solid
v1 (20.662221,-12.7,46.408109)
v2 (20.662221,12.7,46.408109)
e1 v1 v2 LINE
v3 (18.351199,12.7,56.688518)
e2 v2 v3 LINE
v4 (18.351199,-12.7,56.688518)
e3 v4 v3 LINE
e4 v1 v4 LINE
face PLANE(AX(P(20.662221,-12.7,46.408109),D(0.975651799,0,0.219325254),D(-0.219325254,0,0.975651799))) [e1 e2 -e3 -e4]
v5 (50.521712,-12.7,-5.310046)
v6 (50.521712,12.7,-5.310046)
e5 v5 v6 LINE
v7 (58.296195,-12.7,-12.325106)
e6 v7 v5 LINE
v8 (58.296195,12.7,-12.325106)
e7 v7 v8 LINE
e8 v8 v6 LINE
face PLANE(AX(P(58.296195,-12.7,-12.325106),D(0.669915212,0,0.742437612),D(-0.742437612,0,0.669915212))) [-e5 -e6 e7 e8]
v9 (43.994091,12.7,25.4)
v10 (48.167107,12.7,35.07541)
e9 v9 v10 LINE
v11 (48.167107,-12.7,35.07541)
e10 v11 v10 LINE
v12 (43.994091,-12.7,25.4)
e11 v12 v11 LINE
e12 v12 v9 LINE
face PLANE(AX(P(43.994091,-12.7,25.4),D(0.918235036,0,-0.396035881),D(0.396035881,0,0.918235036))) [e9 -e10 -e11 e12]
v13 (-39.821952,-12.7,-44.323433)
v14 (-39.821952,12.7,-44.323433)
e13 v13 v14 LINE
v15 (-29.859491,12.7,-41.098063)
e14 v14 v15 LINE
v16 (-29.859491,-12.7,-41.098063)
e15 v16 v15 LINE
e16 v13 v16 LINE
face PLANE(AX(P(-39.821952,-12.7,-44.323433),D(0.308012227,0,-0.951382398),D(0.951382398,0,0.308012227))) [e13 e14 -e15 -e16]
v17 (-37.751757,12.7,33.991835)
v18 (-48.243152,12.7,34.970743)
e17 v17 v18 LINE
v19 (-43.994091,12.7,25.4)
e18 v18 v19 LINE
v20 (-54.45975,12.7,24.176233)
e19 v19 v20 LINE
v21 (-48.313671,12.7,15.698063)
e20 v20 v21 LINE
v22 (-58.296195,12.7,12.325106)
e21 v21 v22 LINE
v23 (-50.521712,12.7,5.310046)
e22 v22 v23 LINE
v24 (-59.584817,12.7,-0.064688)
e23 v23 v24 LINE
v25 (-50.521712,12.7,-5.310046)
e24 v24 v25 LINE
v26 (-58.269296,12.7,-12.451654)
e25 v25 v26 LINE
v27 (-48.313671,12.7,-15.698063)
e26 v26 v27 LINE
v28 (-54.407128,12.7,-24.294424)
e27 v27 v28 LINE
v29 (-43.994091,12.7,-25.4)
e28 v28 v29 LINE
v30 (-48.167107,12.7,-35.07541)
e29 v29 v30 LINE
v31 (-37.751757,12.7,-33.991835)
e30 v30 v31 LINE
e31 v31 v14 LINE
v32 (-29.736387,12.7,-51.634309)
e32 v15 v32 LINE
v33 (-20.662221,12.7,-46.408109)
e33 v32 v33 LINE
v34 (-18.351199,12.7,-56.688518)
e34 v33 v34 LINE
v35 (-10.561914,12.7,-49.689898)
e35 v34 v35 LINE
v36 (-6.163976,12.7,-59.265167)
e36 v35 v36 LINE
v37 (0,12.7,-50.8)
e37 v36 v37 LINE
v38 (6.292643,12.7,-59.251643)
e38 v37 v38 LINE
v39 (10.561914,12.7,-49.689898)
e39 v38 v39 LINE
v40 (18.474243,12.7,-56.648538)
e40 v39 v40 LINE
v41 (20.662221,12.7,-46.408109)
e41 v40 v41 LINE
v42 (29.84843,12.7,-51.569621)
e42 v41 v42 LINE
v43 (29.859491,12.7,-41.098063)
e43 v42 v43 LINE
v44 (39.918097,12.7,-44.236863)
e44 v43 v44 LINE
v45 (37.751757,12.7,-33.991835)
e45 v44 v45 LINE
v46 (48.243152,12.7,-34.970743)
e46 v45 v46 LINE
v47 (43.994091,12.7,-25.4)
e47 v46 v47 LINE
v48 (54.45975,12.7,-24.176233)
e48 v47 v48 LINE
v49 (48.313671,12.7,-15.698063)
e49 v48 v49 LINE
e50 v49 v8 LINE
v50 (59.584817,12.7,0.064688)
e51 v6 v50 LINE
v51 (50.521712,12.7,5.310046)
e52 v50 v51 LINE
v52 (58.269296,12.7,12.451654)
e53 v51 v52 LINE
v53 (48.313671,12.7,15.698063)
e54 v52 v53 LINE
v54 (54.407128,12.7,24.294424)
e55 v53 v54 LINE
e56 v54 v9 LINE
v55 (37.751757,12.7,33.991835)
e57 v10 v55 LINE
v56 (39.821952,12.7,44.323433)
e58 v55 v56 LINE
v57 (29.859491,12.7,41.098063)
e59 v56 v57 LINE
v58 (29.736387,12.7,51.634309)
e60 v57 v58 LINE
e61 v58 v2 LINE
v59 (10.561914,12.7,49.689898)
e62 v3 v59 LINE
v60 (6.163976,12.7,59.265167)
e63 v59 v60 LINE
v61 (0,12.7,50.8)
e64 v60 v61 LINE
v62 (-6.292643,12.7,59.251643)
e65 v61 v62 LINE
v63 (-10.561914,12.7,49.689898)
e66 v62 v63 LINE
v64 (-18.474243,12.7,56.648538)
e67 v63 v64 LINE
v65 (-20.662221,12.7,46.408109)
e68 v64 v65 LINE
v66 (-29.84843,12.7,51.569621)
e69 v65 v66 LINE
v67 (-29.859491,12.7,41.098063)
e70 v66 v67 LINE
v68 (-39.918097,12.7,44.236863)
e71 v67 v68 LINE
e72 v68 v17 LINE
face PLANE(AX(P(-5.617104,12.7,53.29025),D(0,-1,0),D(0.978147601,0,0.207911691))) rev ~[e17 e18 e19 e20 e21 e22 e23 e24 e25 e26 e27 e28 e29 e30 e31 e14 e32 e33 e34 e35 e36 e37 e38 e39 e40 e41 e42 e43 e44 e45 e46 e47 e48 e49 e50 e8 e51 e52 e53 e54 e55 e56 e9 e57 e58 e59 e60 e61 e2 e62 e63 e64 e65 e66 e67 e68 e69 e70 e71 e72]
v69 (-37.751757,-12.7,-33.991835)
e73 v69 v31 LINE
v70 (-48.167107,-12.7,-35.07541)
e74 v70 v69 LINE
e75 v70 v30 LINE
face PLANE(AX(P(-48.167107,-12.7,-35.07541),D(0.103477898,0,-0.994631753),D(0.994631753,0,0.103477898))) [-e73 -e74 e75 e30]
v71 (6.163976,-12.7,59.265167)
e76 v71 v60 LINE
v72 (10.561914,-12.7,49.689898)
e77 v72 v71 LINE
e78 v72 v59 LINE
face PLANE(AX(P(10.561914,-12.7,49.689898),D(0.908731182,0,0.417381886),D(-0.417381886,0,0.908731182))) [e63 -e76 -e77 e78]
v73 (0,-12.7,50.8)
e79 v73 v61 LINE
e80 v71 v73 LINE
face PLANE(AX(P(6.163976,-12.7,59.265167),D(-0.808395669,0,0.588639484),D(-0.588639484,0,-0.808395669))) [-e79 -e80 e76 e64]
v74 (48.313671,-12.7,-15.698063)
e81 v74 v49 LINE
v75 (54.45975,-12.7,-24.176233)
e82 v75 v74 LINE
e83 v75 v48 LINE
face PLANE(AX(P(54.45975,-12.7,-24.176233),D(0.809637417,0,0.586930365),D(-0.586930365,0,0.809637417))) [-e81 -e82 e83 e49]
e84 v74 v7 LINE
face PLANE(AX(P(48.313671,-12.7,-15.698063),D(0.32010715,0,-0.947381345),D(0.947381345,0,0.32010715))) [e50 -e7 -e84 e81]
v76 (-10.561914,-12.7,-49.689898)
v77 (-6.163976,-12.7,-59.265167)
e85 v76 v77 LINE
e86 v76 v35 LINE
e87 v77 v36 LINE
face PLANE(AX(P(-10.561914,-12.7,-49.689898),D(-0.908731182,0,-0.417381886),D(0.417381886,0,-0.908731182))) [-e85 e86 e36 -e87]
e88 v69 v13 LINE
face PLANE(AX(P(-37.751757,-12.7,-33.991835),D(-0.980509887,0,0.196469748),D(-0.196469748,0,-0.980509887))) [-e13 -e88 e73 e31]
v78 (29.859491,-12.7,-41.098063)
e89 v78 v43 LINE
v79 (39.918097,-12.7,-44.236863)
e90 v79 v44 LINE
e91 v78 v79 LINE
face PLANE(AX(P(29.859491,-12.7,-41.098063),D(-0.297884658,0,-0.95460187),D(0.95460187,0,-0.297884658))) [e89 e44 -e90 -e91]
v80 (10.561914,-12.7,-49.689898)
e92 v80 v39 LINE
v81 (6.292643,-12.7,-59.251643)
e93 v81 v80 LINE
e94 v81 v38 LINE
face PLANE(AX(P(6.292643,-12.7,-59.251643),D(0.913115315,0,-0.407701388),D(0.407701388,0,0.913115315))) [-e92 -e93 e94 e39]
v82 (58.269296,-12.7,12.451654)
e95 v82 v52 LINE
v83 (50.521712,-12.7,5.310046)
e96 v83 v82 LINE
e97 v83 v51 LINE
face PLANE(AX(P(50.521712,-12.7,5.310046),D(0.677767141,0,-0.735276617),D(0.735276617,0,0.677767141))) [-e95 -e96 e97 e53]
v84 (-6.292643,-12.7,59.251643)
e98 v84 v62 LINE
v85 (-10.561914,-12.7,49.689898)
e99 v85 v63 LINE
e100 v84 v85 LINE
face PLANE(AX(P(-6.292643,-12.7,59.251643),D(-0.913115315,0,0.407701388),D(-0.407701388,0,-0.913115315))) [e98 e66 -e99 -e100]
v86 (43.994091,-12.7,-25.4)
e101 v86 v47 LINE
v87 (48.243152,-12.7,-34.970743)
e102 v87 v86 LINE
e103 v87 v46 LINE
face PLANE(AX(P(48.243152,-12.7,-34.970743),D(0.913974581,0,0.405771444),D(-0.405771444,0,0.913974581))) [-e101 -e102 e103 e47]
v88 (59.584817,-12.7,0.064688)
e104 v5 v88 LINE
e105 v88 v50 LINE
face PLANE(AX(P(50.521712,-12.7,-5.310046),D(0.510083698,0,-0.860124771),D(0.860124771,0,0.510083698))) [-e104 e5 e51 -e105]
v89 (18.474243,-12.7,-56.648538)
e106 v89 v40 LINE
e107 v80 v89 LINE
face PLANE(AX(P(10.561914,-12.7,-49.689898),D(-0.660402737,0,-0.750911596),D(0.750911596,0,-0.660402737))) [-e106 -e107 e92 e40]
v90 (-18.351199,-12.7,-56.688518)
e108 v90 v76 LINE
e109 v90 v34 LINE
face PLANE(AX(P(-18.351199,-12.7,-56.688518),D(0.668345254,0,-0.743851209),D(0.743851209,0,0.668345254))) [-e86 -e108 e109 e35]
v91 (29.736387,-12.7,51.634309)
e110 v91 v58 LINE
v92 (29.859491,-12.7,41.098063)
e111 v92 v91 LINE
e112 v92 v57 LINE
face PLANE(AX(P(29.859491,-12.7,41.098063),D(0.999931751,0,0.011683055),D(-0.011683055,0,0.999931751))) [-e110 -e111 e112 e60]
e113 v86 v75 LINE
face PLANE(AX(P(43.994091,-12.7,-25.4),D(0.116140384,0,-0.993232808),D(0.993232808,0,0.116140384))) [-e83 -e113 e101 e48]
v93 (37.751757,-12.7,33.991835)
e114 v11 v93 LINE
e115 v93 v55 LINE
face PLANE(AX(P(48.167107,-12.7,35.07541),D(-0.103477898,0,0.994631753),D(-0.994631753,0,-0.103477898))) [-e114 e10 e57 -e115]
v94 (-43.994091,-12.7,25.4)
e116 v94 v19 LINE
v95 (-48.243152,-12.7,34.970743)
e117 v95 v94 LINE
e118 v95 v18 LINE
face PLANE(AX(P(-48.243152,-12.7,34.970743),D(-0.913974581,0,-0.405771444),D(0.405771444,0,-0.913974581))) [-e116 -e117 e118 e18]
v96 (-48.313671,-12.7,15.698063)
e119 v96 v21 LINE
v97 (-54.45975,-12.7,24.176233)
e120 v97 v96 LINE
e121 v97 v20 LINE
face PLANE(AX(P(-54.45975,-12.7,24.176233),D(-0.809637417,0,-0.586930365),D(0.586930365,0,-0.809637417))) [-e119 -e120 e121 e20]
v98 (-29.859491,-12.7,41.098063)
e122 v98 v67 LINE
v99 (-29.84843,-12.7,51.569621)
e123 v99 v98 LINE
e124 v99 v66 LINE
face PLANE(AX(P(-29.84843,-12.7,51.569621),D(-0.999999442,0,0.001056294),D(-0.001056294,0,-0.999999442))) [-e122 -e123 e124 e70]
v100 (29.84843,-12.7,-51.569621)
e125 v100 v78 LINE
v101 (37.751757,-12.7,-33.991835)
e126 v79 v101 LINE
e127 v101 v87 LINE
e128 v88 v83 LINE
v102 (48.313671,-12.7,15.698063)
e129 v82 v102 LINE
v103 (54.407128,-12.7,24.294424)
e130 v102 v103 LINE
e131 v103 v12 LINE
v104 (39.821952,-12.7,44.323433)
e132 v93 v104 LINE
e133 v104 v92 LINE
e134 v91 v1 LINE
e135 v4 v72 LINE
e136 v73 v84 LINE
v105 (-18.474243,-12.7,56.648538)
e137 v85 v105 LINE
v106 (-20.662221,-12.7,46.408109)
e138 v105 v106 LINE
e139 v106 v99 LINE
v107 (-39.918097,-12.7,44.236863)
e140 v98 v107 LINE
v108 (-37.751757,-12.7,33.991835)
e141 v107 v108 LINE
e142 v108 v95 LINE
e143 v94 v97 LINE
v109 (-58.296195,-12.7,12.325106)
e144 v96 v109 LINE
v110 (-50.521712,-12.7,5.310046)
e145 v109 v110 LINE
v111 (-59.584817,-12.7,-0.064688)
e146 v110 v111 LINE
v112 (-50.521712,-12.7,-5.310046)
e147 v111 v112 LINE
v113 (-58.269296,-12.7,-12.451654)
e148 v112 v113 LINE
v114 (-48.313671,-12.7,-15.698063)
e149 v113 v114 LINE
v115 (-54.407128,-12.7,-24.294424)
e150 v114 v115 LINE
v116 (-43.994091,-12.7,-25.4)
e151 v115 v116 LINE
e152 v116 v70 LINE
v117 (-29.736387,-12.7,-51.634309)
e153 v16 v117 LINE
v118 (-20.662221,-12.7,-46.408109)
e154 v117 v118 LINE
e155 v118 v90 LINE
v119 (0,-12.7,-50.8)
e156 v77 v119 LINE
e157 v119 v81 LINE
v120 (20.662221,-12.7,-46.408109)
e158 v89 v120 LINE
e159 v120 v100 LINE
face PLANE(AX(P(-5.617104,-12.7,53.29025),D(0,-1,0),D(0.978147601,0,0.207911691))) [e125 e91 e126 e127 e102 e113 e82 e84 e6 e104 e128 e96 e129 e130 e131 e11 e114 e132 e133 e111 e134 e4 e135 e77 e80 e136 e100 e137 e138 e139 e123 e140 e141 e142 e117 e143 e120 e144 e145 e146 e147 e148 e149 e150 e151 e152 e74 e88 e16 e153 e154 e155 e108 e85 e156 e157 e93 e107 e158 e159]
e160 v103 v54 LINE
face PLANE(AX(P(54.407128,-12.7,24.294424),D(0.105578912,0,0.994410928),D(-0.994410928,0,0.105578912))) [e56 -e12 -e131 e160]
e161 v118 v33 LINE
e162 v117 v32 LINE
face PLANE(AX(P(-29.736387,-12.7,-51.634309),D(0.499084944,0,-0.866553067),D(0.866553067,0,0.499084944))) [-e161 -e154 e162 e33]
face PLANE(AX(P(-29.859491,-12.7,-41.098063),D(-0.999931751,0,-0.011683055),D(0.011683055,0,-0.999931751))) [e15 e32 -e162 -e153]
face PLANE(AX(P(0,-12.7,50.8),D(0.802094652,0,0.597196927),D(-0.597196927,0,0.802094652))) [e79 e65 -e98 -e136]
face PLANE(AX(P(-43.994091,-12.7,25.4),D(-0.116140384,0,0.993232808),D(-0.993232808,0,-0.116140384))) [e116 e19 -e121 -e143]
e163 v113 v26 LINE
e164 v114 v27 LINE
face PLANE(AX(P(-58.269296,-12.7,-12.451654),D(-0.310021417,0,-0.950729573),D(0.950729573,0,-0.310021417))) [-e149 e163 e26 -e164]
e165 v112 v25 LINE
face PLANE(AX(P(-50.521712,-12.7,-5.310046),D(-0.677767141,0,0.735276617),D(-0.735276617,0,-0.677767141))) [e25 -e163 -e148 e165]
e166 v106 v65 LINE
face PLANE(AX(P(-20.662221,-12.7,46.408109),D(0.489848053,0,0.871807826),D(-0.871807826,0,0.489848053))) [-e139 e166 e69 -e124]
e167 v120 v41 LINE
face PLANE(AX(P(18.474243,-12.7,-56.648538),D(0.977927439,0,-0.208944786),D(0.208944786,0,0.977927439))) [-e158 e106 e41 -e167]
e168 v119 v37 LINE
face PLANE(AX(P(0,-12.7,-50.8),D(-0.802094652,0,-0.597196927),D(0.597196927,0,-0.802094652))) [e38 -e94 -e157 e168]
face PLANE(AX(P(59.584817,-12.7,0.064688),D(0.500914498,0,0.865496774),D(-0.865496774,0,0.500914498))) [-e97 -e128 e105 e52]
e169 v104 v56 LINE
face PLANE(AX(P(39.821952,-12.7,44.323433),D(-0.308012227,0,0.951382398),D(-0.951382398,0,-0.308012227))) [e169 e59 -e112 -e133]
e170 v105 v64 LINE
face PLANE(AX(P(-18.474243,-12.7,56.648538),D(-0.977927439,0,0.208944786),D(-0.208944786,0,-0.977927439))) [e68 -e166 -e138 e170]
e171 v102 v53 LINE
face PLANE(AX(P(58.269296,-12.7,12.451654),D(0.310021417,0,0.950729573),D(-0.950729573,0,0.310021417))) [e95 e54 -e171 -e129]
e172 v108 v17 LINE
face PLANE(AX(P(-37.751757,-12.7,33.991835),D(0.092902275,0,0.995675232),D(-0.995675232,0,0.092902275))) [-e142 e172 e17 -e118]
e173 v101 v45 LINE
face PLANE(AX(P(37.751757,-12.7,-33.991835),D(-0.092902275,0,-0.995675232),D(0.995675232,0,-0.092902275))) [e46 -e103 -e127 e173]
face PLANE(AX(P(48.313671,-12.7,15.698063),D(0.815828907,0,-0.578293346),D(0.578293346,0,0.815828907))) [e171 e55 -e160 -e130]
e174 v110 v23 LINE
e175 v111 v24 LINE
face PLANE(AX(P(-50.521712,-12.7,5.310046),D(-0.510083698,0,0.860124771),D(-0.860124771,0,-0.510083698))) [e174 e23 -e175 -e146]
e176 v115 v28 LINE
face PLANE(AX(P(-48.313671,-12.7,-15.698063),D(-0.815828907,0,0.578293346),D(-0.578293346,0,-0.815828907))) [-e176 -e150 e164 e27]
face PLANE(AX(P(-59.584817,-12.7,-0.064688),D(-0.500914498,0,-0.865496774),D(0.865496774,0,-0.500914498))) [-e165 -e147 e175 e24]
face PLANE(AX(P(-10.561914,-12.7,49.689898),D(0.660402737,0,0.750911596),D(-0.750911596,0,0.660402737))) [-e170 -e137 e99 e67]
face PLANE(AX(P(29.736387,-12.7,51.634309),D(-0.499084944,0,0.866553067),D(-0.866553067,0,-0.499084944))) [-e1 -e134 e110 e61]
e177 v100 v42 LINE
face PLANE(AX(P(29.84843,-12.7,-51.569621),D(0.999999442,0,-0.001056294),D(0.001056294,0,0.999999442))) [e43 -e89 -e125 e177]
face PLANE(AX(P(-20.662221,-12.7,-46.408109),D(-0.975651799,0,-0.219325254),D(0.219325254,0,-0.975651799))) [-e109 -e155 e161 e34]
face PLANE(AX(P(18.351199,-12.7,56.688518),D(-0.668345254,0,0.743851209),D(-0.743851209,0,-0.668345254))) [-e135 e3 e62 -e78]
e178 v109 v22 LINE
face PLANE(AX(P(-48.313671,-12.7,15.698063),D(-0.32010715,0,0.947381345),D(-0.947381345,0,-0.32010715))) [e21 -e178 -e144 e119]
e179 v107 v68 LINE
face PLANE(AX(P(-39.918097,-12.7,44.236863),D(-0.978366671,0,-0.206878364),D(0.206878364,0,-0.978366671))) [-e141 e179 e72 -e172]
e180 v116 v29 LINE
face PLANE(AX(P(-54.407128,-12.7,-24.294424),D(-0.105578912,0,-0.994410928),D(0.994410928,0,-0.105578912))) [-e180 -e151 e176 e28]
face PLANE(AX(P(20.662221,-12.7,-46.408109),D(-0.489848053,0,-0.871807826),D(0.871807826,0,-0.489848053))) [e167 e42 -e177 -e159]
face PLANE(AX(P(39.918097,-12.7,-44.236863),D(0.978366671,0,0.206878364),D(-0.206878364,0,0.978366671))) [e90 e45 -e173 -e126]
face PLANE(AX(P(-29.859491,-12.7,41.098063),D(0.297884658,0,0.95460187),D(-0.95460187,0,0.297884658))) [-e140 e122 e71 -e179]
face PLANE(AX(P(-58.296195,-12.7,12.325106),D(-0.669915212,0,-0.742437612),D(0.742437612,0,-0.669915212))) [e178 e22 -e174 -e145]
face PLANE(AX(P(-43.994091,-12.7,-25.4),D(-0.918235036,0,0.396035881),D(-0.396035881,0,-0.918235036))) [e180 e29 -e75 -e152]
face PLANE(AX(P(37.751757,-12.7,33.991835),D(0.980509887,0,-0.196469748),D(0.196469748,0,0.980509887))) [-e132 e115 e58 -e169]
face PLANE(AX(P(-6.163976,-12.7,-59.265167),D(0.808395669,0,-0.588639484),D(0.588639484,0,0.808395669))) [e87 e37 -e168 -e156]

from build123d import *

# Parameters (mm, degrees)
F0_R            = 50.8
F1_DEPTH        = 12.7
F3_DEPTH        = 25.4
F3_COPIES_COUNT = 30


# Not quite as in the source:
# - a pattern or mirror of a feature is missing from the dataset's text; its kind, count and spacing are read off the source's solid


with BuildPart() as f1:
    # F0 (on Front) → F1 (new body, symmetric)
    with BuildSketch(Plane.XZ):
        Circle(F0_R)
    extrude(amount=F1_DEPTH, both=True)

    # F2 (on face) → F3 (join)
    with BuildSketch(Plane.XZ.offset(12.7)):
        with BuildLine():
            ThreePointArc((0, 50.8), (5.310045934, 50.5217122847), (10.5619138935, 49.6898981173))
            Line((10.5619138935, 49.6898981173), (6.1639756896, 59.2651665211))
            Line((6.1639756896, 59.2651665211), (0, 50.8))
        make_face()
    f3 = extrude(amount=-F3_DEPTH)

    # F3_copies: F3 ×30 about axis
    f3_copies_axis = Axis((0, 0, 0), (0, 1, 0))
    for i in range(1, F3_COPIES_COUNT):
        add(f3.rotate(f3_copies_axis, i * 360 / F3_COPIES_COUNT))


solid = f1.part
